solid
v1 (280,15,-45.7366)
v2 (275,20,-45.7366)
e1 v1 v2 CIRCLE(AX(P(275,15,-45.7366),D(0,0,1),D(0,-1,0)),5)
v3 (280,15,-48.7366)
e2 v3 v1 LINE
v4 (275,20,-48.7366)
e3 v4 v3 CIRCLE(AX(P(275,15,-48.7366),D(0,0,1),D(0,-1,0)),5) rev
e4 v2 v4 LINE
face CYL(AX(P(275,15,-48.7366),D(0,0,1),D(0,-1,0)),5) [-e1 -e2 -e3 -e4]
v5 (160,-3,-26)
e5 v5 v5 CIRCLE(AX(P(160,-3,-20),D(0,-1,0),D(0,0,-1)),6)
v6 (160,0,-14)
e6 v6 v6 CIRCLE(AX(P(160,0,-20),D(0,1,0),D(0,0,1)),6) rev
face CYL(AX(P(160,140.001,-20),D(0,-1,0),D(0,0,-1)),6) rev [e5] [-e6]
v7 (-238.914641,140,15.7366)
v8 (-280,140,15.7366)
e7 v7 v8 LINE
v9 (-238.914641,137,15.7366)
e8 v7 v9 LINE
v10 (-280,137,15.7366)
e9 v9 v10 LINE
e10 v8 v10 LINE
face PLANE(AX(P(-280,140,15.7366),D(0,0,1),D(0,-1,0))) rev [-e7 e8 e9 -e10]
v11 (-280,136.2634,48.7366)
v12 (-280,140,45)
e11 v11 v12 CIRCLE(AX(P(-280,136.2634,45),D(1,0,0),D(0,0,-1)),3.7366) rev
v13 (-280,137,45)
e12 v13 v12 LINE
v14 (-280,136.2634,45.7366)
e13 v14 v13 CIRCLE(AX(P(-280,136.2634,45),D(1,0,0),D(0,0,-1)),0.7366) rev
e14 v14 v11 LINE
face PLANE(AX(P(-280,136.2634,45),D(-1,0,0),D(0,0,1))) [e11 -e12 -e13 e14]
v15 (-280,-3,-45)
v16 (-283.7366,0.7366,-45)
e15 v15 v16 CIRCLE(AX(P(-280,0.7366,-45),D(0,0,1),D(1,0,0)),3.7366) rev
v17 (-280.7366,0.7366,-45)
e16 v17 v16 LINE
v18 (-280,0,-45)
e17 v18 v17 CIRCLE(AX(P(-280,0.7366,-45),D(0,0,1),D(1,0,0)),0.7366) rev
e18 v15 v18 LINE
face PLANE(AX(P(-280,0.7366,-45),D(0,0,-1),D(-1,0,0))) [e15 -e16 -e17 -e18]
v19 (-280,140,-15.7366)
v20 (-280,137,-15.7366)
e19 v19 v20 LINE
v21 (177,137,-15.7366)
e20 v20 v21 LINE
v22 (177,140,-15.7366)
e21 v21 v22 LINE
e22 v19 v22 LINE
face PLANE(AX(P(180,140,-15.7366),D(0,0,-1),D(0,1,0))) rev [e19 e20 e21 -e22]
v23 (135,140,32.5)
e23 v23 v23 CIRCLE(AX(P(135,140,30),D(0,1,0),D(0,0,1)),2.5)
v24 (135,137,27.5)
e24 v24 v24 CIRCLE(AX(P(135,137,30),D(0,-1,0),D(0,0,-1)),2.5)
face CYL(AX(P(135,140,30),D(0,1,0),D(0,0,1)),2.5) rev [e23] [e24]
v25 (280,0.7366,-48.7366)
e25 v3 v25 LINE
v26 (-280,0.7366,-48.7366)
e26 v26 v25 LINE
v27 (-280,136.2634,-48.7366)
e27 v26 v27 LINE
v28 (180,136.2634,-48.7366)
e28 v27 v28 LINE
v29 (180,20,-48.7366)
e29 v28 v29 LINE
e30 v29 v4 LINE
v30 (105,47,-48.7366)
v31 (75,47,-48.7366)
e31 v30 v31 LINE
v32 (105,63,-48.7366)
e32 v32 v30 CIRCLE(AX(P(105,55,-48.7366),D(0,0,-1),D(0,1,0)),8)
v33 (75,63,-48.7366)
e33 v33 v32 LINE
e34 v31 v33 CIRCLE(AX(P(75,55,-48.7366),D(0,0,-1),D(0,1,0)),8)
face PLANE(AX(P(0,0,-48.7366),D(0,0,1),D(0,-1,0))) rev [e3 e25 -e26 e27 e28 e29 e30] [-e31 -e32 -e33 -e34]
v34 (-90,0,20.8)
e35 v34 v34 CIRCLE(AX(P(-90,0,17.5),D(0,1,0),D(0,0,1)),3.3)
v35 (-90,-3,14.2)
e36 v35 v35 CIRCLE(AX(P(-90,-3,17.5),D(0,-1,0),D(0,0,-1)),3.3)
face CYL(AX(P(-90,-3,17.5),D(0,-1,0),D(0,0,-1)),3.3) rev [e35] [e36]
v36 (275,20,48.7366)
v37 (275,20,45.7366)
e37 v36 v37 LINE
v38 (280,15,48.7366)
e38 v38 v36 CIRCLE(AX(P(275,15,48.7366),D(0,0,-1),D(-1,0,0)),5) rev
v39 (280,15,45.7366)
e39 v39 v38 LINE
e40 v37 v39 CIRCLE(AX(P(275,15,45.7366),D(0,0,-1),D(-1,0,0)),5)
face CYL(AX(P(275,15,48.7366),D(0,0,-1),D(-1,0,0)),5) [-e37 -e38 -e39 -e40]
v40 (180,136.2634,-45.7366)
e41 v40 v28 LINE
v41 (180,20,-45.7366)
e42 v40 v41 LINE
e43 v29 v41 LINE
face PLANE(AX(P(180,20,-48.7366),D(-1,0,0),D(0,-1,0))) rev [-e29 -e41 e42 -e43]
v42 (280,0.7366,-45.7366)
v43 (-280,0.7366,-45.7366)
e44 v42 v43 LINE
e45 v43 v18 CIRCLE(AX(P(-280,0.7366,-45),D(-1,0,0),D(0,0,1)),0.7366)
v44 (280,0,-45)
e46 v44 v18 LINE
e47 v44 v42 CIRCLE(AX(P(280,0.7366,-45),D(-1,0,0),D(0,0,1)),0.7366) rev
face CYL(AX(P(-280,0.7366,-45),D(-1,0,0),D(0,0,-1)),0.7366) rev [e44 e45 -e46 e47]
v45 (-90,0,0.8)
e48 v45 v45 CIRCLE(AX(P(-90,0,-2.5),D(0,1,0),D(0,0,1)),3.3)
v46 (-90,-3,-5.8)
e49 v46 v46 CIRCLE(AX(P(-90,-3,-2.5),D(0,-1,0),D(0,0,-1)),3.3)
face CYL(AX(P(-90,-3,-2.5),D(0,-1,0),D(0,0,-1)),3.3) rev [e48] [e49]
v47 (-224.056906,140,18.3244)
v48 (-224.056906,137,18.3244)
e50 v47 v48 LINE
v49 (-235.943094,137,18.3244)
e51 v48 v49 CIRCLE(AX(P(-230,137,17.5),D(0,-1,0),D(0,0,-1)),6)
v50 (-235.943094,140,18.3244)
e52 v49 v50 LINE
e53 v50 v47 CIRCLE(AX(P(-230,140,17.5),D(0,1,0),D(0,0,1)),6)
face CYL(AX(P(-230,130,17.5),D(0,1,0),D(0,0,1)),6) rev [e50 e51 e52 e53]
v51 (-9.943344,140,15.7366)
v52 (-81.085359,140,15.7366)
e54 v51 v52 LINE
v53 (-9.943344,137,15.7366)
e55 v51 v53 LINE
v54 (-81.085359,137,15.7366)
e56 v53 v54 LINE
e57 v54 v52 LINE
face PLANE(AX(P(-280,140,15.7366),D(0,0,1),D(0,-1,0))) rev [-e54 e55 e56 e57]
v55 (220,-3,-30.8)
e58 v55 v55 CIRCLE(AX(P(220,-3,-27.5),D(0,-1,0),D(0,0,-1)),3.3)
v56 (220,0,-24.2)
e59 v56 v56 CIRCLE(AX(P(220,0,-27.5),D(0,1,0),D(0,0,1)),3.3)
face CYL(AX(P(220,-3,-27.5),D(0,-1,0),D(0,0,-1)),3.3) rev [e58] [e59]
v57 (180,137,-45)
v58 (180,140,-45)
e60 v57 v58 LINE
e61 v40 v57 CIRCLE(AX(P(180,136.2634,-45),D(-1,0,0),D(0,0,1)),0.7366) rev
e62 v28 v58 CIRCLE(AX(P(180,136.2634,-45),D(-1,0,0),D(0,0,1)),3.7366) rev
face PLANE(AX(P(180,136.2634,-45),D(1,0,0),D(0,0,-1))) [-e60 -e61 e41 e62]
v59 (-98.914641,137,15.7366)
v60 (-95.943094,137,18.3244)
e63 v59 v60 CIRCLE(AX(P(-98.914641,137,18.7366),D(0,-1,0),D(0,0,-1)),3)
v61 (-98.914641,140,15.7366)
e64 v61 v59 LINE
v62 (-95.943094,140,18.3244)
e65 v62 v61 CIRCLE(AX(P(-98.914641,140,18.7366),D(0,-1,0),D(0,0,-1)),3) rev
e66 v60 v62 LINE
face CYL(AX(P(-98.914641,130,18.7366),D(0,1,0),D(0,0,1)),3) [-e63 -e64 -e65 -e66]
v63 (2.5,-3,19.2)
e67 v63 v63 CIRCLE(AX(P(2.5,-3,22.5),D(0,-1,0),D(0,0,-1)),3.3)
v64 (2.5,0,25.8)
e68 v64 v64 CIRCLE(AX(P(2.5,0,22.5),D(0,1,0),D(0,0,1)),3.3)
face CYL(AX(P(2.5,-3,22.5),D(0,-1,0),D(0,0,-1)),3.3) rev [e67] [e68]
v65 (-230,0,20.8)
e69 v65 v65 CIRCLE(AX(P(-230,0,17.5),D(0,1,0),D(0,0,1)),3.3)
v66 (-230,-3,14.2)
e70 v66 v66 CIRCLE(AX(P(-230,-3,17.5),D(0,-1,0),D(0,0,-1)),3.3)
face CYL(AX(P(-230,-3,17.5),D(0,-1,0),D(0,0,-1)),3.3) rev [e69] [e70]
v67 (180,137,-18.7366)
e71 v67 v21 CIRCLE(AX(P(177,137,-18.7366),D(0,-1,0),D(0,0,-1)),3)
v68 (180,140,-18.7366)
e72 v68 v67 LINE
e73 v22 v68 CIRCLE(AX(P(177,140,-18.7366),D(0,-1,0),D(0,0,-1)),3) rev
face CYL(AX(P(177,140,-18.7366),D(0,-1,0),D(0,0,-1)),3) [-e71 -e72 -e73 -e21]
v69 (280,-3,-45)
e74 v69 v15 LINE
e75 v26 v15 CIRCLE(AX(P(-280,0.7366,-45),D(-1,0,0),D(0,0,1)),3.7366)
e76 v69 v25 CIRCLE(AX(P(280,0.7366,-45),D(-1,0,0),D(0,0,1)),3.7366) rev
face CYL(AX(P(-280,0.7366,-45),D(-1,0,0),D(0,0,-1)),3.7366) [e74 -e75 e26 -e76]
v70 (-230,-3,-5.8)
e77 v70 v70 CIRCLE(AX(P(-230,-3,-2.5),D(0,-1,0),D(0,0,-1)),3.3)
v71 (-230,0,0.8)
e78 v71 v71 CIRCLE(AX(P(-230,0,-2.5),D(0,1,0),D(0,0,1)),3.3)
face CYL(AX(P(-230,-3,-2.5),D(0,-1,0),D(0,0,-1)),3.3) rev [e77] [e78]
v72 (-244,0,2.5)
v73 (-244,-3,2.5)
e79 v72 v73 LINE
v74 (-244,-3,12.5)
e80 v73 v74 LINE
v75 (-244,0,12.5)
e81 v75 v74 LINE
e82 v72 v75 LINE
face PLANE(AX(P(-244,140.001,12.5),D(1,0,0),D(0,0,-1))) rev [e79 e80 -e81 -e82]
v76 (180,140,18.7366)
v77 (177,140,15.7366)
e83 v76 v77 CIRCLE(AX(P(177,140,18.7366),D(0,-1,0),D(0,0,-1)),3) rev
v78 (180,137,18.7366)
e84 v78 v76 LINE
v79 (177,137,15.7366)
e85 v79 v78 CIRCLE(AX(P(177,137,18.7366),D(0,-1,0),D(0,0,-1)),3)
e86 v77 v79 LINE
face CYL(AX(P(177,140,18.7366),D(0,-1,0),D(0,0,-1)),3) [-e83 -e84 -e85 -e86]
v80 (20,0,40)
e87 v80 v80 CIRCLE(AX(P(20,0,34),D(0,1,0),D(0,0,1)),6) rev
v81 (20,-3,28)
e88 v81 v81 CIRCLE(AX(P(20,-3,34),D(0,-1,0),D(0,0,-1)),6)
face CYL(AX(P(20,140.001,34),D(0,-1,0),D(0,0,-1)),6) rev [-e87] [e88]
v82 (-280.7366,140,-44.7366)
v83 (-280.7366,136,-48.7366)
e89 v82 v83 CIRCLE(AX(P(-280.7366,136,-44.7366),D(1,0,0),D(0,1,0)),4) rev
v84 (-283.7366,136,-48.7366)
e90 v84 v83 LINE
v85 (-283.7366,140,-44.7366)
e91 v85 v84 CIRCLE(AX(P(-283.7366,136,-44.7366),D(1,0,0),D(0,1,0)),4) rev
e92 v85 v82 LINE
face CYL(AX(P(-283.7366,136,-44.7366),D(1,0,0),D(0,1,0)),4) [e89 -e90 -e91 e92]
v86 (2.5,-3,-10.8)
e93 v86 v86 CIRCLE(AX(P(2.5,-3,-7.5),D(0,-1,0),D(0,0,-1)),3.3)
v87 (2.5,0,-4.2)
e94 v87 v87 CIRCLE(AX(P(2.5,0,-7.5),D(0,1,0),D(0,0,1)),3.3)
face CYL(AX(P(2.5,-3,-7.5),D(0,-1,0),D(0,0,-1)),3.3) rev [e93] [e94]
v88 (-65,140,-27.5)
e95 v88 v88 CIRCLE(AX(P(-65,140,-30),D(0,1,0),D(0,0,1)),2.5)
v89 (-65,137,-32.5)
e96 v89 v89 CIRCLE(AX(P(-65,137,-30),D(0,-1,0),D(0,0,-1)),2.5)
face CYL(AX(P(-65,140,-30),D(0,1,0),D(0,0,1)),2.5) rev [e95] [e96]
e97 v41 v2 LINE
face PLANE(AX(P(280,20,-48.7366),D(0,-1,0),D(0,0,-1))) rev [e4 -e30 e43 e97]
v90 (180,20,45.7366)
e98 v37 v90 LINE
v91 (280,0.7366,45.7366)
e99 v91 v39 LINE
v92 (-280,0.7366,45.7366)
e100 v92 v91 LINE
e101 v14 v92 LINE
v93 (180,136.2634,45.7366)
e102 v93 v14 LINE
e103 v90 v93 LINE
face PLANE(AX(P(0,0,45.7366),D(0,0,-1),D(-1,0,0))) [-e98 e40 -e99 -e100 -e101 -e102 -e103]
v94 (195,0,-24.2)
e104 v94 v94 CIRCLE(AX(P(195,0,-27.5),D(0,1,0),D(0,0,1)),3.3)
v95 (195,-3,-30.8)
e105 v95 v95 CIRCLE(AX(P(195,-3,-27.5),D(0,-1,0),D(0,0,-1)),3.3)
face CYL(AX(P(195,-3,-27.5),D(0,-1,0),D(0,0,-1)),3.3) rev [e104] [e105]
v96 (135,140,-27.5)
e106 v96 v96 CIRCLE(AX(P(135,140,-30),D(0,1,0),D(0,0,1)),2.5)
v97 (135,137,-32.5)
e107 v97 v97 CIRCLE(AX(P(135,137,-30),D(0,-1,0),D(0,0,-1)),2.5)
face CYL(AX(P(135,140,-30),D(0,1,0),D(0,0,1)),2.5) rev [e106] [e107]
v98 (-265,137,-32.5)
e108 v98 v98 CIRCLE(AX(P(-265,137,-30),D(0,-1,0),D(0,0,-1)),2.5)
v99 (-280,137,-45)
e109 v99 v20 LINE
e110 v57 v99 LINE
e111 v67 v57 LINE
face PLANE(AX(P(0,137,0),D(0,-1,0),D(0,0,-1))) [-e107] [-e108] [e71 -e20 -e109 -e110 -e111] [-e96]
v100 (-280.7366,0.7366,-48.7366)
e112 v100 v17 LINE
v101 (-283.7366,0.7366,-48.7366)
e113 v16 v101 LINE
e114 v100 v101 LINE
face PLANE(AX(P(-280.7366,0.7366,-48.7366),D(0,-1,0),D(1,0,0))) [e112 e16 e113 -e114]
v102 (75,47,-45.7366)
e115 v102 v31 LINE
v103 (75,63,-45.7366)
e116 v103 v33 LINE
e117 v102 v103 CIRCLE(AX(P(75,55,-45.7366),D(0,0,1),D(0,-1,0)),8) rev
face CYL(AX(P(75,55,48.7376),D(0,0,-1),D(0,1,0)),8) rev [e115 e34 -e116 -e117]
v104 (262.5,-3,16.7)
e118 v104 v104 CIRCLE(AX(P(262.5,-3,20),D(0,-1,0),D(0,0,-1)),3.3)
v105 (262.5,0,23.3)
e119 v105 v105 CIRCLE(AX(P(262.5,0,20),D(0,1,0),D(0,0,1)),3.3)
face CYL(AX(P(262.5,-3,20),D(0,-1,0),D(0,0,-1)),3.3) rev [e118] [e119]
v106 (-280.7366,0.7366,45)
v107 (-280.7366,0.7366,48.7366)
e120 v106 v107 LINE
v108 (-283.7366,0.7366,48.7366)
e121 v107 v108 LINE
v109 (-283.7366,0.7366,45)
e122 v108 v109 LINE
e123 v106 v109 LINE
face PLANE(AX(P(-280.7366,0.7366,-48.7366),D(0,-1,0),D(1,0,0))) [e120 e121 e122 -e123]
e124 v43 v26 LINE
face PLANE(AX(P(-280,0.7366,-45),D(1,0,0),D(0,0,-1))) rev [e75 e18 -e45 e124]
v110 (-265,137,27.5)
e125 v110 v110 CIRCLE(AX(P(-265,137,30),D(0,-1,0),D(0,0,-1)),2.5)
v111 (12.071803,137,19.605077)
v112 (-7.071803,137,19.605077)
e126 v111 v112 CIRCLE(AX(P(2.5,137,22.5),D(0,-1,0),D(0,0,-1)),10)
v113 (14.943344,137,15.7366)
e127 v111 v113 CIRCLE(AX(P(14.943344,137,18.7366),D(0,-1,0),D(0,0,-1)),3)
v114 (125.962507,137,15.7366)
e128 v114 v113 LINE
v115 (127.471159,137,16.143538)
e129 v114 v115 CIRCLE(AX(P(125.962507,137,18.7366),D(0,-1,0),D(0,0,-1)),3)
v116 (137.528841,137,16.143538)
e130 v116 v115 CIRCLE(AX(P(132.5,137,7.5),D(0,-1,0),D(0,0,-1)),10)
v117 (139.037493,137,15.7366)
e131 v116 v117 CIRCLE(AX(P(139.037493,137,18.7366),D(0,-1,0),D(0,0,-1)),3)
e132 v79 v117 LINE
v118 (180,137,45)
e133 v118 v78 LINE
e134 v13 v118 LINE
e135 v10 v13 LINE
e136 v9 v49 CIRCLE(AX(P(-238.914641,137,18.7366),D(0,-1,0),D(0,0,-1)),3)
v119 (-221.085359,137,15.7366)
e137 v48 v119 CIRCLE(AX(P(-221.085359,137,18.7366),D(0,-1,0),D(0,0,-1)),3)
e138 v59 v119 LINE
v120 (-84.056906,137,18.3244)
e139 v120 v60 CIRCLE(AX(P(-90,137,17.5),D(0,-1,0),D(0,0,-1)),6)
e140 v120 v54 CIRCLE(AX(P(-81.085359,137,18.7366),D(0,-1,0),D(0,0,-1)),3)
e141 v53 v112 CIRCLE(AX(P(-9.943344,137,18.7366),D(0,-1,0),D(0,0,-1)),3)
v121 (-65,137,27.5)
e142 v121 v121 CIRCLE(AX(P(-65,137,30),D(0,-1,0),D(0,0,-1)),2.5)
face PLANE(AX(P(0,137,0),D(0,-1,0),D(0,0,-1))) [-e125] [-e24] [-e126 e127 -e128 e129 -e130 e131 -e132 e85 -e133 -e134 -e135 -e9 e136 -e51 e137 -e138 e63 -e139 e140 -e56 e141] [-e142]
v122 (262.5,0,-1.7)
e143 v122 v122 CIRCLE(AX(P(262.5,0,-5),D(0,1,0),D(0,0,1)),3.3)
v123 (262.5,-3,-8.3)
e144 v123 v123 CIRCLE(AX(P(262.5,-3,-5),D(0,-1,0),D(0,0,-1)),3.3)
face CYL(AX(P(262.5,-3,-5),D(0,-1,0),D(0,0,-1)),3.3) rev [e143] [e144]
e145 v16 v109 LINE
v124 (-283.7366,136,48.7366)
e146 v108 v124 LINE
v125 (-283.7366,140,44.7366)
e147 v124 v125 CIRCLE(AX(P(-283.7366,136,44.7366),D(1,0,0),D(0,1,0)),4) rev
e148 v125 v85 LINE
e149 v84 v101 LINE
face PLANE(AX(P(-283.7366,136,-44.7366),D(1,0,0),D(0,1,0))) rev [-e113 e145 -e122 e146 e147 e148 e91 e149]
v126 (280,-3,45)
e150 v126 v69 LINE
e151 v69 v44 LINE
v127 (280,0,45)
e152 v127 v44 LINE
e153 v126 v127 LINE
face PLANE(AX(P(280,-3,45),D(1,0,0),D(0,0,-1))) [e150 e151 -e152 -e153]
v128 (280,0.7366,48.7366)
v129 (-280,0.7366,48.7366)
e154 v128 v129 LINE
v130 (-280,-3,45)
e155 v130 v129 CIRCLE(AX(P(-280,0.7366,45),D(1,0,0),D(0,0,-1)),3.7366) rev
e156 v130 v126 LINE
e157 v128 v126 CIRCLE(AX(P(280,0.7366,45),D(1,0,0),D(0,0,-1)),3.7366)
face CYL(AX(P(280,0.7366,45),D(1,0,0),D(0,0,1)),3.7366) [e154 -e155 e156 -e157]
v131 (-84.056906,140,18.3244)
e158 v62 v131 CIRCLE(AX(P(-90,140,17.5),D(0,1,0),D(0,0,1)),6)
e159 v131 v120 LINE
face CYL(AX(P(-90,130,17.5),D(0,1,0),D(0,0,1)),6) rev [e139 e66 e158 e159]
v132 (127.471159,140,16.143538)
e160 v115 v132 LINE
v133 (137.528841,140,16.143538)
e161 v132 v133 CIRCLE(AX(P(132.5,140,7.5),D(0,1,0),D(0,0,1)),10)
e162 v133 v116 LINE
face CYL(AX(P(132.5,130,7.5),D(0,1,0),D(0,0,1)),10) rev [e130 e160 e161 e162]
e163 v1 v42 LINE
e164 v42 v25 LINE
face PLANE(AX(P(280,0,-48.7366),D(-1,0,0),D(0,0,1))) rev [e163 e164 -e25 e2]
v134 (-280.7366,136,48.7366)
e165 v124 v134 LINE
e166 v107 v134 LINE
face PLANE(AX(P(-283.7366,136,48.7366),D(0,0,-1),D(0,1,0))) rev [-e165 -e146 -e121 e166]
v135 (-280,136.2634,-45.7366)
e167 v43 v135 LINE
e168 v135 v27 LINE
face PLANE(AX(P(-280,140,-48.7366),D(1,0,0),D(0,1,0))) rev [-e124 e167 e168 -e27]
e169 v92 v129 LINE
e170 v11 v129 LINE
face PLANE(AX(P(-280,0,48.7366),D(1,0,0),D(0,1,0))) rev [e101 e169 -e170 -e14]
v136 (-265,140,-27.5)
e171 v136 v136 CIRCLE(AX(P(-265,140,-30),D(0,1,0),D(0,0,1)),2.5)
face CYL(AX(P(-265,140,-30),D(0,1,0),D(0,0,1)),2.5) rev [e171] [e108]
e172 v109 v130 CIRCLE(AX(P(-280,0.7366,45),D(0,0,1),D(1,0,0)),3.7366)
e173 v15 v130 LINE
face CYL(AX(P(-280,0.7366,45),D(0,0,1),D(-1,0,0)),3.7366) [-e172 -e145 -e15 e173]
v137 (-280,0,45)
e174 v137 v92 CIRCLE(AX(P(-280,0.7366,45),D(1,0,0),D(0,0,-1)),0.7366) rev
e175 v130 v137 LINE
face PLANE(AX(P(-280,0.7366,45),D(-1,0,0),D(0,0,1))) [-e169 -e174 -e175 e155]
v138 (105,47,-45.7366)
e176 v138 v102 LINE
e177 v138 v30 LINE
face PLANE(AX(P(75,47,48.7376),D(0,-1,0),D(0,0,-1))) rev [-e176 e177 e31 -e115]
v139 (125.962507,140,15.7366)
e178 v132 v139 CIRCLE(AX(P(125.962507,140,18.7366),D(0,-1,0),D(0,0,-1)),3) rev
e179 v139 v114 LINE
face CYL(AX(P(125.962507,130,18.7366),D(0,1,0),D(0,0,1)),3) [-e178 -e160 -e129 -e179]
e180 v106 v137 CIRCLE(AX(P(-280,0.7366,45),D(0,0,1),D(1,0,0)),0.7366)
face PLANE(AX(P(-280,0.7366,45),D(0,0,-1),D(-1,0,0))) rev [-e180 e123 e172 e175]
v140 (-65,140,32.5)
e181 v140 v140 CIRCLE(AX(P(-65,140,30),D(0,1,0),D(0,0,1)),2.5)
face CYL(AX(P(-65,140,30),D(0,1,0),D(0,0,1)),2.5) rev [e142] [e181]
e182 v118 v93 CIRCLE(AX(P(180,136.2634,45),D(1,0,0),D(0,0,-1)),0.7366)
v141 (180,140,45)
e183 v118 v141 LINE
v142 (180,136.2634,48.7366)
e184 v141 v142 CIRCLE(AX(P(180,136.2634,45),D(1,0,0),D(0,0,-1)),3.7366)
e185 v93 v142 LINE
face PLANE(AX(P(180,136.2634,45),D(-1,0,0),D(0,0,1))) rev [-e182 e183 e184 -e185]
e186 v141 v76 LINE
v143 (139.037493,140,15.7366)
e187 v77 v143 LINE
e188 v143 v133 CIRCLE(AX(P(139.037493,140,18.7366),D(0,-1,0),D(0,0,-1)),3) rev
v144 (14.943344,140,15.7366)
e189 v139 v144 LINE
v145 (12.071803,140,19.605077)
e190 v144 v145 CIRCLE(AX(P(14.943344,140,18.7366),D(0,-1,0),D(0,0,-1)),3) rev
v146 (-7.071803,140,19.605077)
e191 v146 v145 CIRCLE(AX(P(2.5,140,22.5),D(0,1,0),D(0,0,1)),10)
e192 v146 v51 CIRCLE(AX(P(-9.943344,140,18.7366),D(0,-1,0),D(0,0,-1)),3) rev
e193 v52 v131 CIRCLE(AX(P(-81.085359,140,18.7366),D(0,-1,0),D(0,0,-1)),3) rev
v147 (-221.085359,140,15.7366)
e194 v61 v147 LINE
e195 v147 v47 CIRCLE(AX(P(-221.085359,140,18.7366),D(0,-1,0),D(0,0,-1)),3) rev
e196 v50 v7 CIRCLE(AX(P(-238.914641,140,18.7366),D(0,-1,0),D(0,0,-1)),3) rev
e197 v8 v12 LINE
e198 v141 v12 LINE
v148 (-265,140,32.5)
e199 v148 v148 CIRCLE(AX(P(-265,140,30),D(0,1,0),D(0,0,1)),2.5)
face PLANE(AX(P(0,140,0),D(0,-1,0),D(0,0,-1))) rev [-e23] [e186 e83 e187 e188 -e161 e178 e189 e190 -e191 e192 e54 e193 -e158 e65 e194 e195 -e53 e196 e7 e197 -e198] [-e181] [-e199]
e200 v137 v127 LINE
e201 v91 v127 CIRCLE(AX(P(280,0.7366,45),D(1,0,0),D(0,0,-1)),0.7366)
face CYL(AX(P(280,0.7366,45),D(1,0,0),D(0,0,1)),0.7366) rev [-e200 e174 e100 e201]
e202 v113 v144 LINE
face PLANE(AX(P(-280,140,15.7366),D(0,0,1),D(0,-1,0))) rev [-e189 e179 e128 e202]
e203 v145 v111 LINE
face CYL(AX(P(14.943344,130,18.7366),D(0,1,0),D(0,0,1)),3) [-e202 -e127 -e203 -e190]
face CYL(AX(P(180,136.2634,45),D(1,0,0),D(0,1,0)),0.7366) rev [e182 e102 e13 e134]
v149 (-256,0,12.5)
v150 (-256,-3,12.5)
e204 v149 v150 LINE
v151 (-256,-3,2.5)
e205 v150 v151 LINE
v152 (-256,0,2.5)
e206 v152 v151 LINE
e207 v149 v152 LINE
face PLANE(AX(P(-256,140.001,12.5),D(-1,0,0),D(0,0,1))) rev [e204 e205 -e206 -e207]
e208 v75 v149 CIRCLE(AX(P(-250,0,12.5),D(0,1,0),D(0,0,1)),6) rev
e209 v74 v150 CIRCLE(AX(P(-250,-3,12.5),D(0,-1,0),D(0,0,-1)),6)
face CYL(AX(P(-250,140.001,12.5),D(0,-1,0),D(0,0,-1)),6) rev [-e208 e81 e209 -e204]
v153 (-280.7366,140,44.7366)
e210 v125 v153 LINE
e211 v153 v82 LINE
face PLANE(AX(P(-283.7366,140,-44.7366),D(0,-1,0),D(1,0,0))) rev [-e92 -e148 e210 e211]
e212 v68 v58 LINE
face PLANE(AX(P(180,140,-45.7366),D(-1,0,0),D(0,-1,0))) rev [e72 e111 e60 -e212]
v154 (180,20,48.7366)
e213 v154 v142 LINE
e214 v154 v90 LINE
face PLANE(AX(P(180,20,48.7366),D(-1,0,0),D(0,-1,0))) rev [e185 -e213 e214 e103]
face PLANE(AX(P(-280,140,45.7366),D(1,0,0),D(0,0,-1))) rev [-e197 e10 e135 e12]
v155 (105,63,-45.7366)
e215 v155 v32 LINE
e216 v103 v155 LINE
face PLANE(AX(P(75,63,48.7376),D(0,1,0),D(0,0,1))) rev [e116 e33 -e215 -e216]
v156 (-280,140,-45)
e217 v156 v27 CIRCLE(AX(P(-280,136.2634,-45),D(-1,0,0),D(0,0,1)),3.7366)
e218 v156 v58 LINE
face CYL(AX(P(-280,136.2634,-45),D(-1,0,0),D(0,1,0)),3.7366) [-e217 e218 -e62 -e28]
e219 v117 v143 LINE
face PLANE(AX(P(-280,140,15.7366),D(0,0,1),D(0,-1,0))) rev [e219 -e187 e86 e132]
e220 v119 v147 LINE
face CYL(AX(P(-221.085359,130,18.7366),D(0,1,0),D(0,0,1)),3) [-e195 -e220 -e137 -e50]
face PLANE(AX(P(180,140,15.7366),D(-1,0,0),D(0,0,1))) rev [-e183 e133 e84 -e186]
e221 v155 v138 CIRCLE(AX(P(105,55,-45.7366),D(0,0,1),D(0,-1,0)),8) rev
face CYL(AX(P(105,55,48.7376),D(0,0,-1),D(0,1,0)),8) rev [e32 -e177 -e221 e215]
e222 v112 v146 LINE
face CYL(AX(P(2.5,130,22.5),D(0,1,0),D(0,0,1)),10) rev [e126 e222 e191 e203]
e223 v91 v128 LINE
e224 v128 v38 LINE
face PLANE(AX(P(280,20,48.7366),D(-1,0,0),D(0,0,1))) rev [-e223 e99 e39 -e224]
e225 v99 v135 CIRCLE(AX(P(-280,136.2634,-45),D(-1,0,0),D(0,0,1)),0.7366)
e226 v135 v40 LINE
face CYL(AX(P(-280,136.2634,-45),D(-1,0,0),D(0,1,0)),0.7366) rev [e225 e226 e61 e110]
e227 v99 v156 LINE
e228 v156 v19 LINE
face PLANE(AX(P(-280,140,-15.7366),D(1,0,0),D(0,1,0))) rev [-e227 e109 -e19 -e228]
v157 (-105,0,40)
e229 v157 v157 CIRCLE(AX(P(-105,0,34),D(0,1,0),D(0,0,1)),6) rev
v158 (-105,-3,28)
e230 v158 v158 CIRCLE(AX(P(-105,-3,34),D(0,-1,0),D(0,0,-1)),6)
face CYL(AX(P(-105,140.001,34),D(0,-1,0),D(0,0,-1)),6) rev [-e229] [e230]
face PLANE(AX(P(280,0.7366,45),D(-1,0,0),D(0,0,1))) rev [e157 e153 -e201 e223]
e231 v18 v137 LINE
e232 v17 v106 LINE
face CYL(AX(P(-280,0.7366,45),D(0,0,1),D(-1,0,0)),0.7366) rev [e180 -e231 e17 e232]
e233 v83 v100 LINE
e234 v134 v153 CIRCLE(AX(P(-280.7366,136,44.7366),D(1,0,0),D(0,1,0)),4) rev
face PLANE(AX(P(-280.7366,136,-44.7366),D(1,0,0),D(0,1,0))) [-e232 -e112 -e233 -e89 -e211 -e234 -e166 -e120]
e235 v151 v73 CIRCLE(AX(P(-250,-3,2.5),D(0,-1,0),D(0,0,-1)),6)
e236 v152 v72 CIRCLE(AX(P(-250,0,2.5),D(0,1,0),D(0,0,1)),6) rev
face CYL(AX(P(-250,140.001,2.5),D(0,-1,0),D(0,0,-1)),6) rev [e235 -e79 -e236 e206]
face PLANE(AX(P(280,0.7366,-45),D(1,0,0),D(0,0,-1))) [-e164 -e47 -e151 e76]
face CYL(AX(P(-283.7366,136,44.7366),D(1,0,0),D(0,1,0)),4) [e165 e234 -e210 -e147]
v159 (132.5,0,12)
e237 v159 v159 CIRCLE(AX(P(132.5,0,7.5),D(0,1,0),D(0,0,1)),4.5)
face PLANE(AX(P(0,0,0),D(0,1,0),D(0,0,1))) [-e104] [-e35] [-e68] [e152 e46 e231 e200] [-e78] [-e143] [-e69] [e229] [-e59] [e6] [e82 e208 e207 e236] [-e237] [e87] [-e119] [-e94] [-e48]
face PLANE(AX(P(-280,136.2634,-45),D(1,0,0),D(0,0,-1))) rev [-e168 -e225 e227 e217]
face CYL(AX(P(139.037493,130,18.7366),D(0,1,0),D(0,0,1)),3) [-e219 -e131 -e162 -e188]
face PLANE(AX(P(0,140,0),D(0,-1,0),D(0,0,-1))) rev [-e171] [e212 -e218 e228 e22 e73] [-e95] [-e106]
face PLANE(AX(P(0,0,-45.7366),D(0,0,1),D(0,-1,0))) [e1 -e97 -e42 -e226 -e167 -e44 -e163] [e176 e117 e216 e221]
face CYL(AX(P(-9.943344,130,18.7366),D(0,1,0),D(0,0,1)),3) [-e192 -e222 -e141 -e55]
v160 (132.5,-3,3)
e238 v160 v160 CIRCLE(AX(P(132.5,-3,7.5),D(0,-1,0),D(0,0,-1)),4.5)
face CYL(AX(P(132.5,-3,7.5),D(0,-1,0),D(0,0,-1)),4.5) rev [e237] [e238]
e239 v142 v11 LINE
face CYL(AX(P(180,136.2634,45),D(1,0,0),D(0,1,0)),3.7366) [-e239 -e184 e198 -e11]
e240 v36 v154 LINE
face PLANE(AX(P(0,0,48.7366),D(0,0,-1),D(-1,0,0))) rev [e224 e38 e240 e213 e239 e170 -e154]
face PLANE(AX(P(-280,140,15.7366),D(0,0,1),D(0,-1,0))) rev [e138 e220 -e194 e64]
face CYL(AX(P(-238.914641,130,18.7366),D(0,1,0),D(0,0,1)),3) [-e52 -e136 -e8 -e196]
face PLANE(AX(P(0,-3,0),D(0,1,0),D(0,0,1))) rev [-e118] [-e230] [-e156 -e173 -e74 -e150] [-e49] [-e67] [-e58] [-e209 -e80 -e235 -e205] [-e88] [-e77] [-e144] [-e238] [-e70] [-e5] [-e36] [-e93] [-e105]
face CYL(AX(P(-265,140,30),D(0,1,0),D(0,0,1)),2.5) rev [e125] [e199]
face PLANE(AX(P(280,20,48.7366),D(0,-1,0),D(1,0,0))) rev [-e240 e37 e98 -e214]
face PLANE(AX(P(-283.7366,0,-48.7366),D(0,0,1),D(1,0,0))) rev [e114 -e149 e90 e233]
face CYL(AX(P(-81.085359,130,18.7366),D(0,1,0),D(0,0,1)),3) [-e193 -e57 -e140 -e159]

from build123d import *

# Parameters (mm, degrees)
SKETCH_1_W                         = 560
SKETCH_1_H                         = 90
SM_BASE_FLANGE_1_DEPTH             = 3
SM_EDGE_FLANGE_4_DEPTH             = 560
SM_START                           = 3
SM_EDGE_FLANGE_4_FLAT_DEPTH        = 3
SM_EDGE_FLANGE_4_BEND_DEPTH        = 560
SM_EDGE_FLANGE_4_FLAT_2_DEPTH      = 3
SM_EDGE_FLANGE_5_STRIP_W           = 13.4732
SM_EDGE_FLANGE_5_STRIP_H           = 3
SM_EDGE_FLANGE_5_STRIP_CUT_DEPTH   = 460
SM_EDGE_FLANGE_5_STRIP_2_W         = 13.4732
SM_EDGE_FLANGE_5_STRIP_2_H         = 3
SM_EDGE_FLANGE_5_STRIP_CUT_2_DEPTH = 460
SM_EDGE_FLANGE_5_DEPTH             = 460
SM_EDGE_FLANGE_5_BEND_DEPTH        = 460
FILLET_2_R                         = 5
HOLE_WIZARD_M6_1_D                 = 5
HOLE_WIZARD_M6_1_DEPTH             = 3
HOLE_WIZARD_M6_1_2_D               = 6.6
HOLE_WIZARD_M6_1_2_DEPTH           = 3
SKETCH_62_R                        = 10
SKETCH_62_R_2                      = 6
CUT_EXTRUDE_1_DEPTH                = 10
FILLET_3_R                         = 3
HOLE_WIZARD_M8_1_D                 = 9
SM_START_2                         = -44.7366
SM_EDGE_FLANGE_6_DEPTH             = 89.4732
SM_START_3                         = -45
SM_EDGE_FLANGE_6_2_DEPTH           = 90
SM_START_4                         = -283.7366
SM_EDGE_FLANGE_6_3_DEPTH           = 3
CUT_EXTRUDE_2_REACH                = 323.451
SKETCH_69_R                        = 6
CUT_EXTRUDE_3_REACH                = 333.07
FILLET_4_R                         = 3


with BuildPart() as part:
    # 베이스-플랜지1: sheet metal written as solids
    # Sketch 1 → 베이스-플랜지1 (new body)
    with BuildSketch(Plane(origin=(0, 0, 0), x_dir=(1, 0, 0), z_dir=(0, 1, 0))):
        Rectangle(SKETCH_1_W, SKETCH_1_H)
    extrude(amount=-SM_BASE_FLANGE_1_DEPTH)

    # 모서리 플랜지4: sheet metal written as solids
    # 모서리 플랜지4 bend section (on a plane across the edge) → 모서리 플랜지4 (add)
    with BuildSketch(Plane(origin=(-280, 0, 45.7366), x_dir=(0, 0, -1), z_dir=(1, 0, 0))):
        with BuildLine():
            Line((-3, 0.7366), (0, 0.7366))
            ThreePointArc((0, 0.7366), (0.215745145, 0.215745145), (0.7366, 0))
            Line((0.7366, 0), (0.7366, -3))
            ThreePointArc((0.7366, -3), (-1.905575199, -1.905575199), (-3, 0.7366))
        make_face()
    extrude(amount=SM_EDGE_FLANGE_4_DEPTH)

    # 모서리 플랜지4 profile (on flange) → 모서리 플랜지4 flat (add)
    with BuildSketch(Plane.XY.offset(45.7366).offset(SM_START)):
        Polygon((-280, 140), (-280, 0.7366), (280, 0.7366), (280, 20), (180, 20), (180, 140), align=None)
    extrude(amount=-SM_EDGE_FLANGE_4_FLAT_DEPTH)

    # 모서리 플랜지4 bend section 2 (on a plane across the edge) → 모서리 플랜지4 bend (add)
    with BuildSketch(Plane(origin=(280, 0, -45.7366), x_dir=(0, 0, 1), z_dir=(-1, 0, 0))):
        with BuildLine():
            Line((-3, 0.7366), (0, 0.7366))
            ThreePointArc((0, 0.7366), (0.215745145, 0.215745145), (0.7366, 0))
            Line((0.7366, 0), (0.7366, -3))
            ThreePointArc((0.7366, -3), (-1.905575199, -1.905575199), (-3, 0.7366))
        make_face()
    extrude(amount=SM_EDGE_FLANGE_4_BEND_DEPTH)

    # 모서리 플랜지4 profile 2 (on flange) → 모서리 플랜지4 flat 2 (add)
    with BuildSketch(Plane(origin=(0, 0, -45.7366), x_dir=(-1, 0, 0), z_dir=(0, 0, -1)).offset(SM_START)):
        Polygon((-280, 20), (-280, 0.7366), (280, 0.7366), (280, 140), (-180, 140), (-180, 20), align=None)
    extrude(amount=-SM_EDGE_FLANGE_4_FLAT_2_DEPTH)

    # 모서리 플랜지5: sheet metal written as solids
    # 모서리 플랜지5 strip (on a plane across the edge) → 모서리 플랜지5 strip cut (cut)
    with BuildSketch(Plane(origin=(-280, 140, 45.7366), x_dir=(0, -1, 0), z_dir=(1, 0, 0))):
        with Locations((-3, -1.5)):
            Rectangle(SM_EDGE_FLANGE_5_STRIP_W, SM_EDGE_FLANGE_5_STRIP_H)
    extrude(amount=SM_EDGE_FLANGE_5_STRIP_CUT_DEPTH, mode=Mode.SUBTRACT)

    # 모서리 플랜지5 strip 2 (on a plane across the edge) → 모서리 플랜지5 strip cut 2 (cut)
    with BuildSketch(Plane(origin=(180, 140, -45.7366), x_dir=(0, -1, 0), z_dir=(-1, 0, 0))):
        with Locations((-3, -1.5)):
            Rectangle(SM_EDGE_FLANGE_5_STRIP_2_W, SM_EDGE_FLANGE_5_STRIP_2_H)
    extrude(amount=SM_EDGE_FLANGE_5_STRIP_CUT_2_DEPTH, mode=Mode.SUBTRACT)

    # 모서리 플랜지5 section (on a plane across the edge) → 모서리 플랜지5 (add)
    with BuildSketch(Plane(origin=(-280, 140, 45.7366), x_dir=(0, -1, 0), z_dir=(1, 0, 0))):
        with BuildLine():
            Line((0, 0.7366), (0, 30))
            Line((0, 30), (3, 30))
            Line((3, 30), (3, 0.7366))
            ThreePointArc((3, 0.7366), (3.215745145, 0.215745145), (3.7366, 0))
            Line((3.7366, 0), (3.7366, -3))
            ThreePointArc((3.7366, -3), (1.094424801, -1.905575199), (0, 0.7366))
        make_face()
    extrude(amount=SM_EDGE_FLANGE_5_DEPTH)

    # 모서리 플랜지5 section 2 (on a plane across the edge) → 모서리 플랜지5 bend (add)
    with BuildSketch(Plane(origin=(180, 140, -45.7366), x_dir=(0, -1, 0), z_dir=(-1, 0, 0))):
        with BuildLine():
            Line((0, 0.7366), (0, 30))
            Line((0, 30), (3, 30))
            Line((3, 30), (3, 0.7366))
            ThreePointArc((3, 0.7366), (3.215745145, 0.215745145), (3.7366, 0))
            Line((3.7366, 0), (3.7366, -3))
            ThreePointArc((3.7366, -3), (1.094424801, -1.905575199), (0, 0.7366))
        make_face()
    extrude(amount=SM_EDGE_FLANGE_5_BEND_DEPTH)

    # 필렛2
    fillet_2_edges = [part.edges().sort_by_distance(p)[0] for p in [
        (280, 20, 47.2366),
        (280, 20, -47.2366),
    ]]
    fillet(fillet_2_edges, radius=FILLET_2_R)

    # Hole Wizard M6 _ _ _ _1
    with Locations(Plane(origin=(0, 140, 0), x_dir=(1, 0, 0), z_dir=(0, 1, 0))):
        with Locations((135, -30), (135, 30), (-65, 30), (-65, -30), (-265, -30), (-265, 30)):
            Hole(HOLE_WIZARD_M6_1_D / 2, depth=HOLE_WIZARD_M6_1_DEPTH)

    # Hole Wizard M6 _ _1 2
    with Locations(Plane(origin=(0, -3, 0), x_dir=(-1, 0, 0), z_dir=(0, -1, 0))):
        with Locations((90, -17.5), (90, 2.5), (230, -17.5), (230, 2.5), (-2.5, 7.5), (-2.5, -22.5), (-195, 27.5), (-220, 27.5), (-262.5, 5), (-262.5, -20)):
            Hole(HOLE_WIZARD_M6_1_2_D / 2, depth=HOLE_WIZARD_M6_1_2_DEPTH)

    # 스케치62 → 컷-돌출1 (cut)
    with BuildSketch(Plane(origin=(0, 140, 0), x_dir=(1, 0, 0), z_dir=(0, 1, 0))):
        with Locations((2.5, -22.5)):
            Circle(SKETCH_62_R)
        with Locations((-90, -17.5)):
            Circle(SKETCH_62_R_2)
        with Locations((-230, -17.5)):
            Circle(SKETCH_62_R_2)
        with Locations((132.5, -7.5)):
            Circle(SKETCH_62_R)
    extrude(amount=-CUT_EXTRUDE_1_DEPTH, mode=Mode.SUBTRACT)

    # 필렛3
    fillet_3_edges = [part.edges().sort_by_distance(p)[0] for p in [
        (-4.865895766, 138.5, 15.7366),
        (9.865895766, 138.5, 15.7366),
        (-95.735017039, 138.5, 15.7366),
        (-84.264982961, 138.5, 15.7366),
        (-235.735017039, 138.5, 15.7366),
        (-224.264982961, 138.5, 15.7366),
        (126.829160517, 138.5, 15.7366),
        (138.170839483, 138.5, 15.7366),
    ]]
    fillet(fillet_3_edges, radius=FILLET_3_R)

    # M8 여유 구멍1 (through all)
    with Locations(Plane(origin=(0, -3, 0), x_dir=(-1, 0, 0), z_dir=(0, -1, 0))):
        with Locations((-132.5, -7.5)):
            Hole(HOLE_WIZARD_M8_1_D / 2)

    # 모서리 플랜지6: read off the stored shape, not the designer's step
    # 모서리 플랜지6 outline → 모서리 플랜지6 (add)
    with BuildSketch(Plane.XY.offset(SM_START_2)):
        with BuildLine():
            Line((-280.7366, 140), (-283.7366, 140))
            Line((-283.7366, 140), (-283.7366, 0.7366))
            ThreePointArc((-283.7366, 0.7366), (-282.642175199, -1.905575199), (-280, -3))
            Line((-280, -3), (-280, 0))
            ThreePointArc((-280, 0), (-280.520854855, 0.215745145), (-280.7366, 0.7366))
            Line((-280.7366, 0.7366), (-280.7366, 140))
        make_face()
    extrude(amount=SM_EDGE_FLANGE_6_DEPTH)

    # Sm Edge Flange 6 2 outline → Sm Edge Flange 6 2 (add)
    with BuildSketch(Plane.XY.offset(SM_START_3)):
        with BuildLine():
            Line((-280.7366, 0.7366), (-283.7366, 0.7366))
            ThreePointArc((-283.7366, 0.7366), (-282.642175199, -1.905575199), (-280, -3))
            Line((-280, -3), (-280, 0))
            ThreePointArc((-280, 0), (-280.520854855, 0.215745145), (-280.7366, 0.7366))
        make_face()
    extrude(amount=SM_EDGE_FLANGE_6_2_DEPTH)

    # Sm Edge Flange 6 3 outline → Sm Edge Flange 6 3 (add)
    with BuildSketch(Plane.YZ.offset(SM_START_4)):
        with BuildLine():
            Line((0.7366, -48.7366), (136, -48.7366))
            ThreePointArc((136, -48.7366), (138.828427125, -47.565027125), (140, -44.7366))
            Line((140, -44.7366), (0.7366, -44.7366))
            Line((0.7366, -44.7366), (0.7366, -48.7366))
        make_face()
        with BuildLine():
            Line((136, 48.7366), (0.7366, 48.7366))
            Line((0.7366, 48.7366), (0.7366, 44.7366))
            Line((0.7366, 44.7366), (140, 44.7366))
            ThreePointArc((140, 44.7366), (138.828427125, 47.565027125), (136, 48.7366))
        make_face()
    extrude(amount=SM_EDGE_FLANGE_6_3_DEPTH)

    # 스케치69 → 컷-돌출2 (cut, up to next)
    with BuildSketch(Plane.XZ.offset(3), mode=Mode.PRIVATE) as cut_extrude_2_sk1:
        with Locations(Location((-105, 34, 0), (0, 0, 270))):
            Circle(SKETCH_69_R)
    cut_extrude_2_tool1 = extrude(cut_extrude_2_sk1.sketch, amount=-CUT_EXTRUDE_2_REACH, mode=Mode.PRIVATE) & part.part
    # 스케치69 → 컷-돌출2 (cut, up to next)
    with BuildSketch(Plane.XZ.offset(3), mode=Mode.PRIVATE) as cut_extrude_2_sk2:
        with Locations(Location((20, 34, 0), (0, 0, 270))):
            Circle(SKETCH_69_R)
    cut_extrude_2_tool2 = extrude(cut_extrude_2_sk2.sketch, amount=-CUT_EXTRUDE_2_REACH, mode=Mode.PRIVATE) & part.part
    # 스케치69 → 컷-돌출2 (cut, up to next)
    with BuildSketch(Plane.XZ.offset(3), mode=Mode.PRIVATE) as cut_extrude_2_sk3:
        with Locations(Location((160, -20, 0), (0, 0, 270))):
            Circle(SKETCH_69_R)
    cut_extrude_2_tool3 = extrude(cut_extrude_2_sk3.sketch, amount=-CUT_EXTRUDE_2_REACH, mode=Mode.PRIVATE) & part.part
    # 스케치69 → 컷-돌출2 (cut, up to next)
    with BuildSketch(Plane.XZ.offset(3), mode=Mode.PRIVATE) as cut_extrude_2_sk4:
        with BuildLine():
            Line((-244, 12.5), (-244, 2.5))
            ThreePointArc((-244, 2.5), (-250, -3.5), (-256, 2.5))
            Line((-256, 2.5), (-256, 12.5))
            ThreePointArc((-256, 12.5), (-250, 18.5), (-244, 12.5))
        make_face()
    cut_extrude_2_tool4 = extrude(cut_extrude_2_sk4.sketch, amount=-CUT_EXTRUDE_2_REACH, mode=Mode.PRIVATE) & part.part
    add(cut_extrude_2_tool1.solids().sort_by_distance((-105, -3, 34))[0], mode=Mode.SUBTRACT)
    add(cut_extrude_2_tool2.solids().sort_by_distance((20, -3, 34))[0], mode=Mode.SUBTRACT)
    add(cut_extrude_2_tool3.solids().sort_by_distance((160, -3, -20))[0], mode=Mode.SUBTRACT)
    add(cut_extrude_2_tool4.solids().sort_by_distance((-250, -3, 7.5))[0], mode=Mode.SUBTRACT)

    # 스케치70 → 컷-돌출3 (cut, up to next)
    with BuildSketch(Plane(origin=(0, 0, -48.7366), x_dir=(-1, 0, 0), z_dir=(0, 0, -1)), mode=Mode.PRIVATE) as cut_extrude_3_sk1:
        with BuildLine():
            Line((-75, 47), (-105, 47))
            ThreePointArc((-105, 47), (-113, 55), (-105, 63))
            Line((-105, 63), (-75, 63))
            ThreePointArc((-75, 63), (-67, 55), (-75, 47))
        make_face()
    cut_extrude_3_tool1 = extrude(cut_extrude_3_sk1.sketch, amount=-CUT_EXTRUDE_3_REACH, mode=Mode.PRIVATE) & part.part
    add(cut_extrude_3_tool1.solids().sort_by_distance((90, 55, -48.7366))[0], mode=Mode.SUBTRACT)

    # 필렛4
    fillet_4_edges = [part.edges().sort_by_distance(p)[0] for p in [
        (180, 138.5, -15.7366),
        (180, 138.5, 15.7366),
    ]]
    fillet(fillet_4_edges, radius=FILLET_4_R)


solid = part.part
